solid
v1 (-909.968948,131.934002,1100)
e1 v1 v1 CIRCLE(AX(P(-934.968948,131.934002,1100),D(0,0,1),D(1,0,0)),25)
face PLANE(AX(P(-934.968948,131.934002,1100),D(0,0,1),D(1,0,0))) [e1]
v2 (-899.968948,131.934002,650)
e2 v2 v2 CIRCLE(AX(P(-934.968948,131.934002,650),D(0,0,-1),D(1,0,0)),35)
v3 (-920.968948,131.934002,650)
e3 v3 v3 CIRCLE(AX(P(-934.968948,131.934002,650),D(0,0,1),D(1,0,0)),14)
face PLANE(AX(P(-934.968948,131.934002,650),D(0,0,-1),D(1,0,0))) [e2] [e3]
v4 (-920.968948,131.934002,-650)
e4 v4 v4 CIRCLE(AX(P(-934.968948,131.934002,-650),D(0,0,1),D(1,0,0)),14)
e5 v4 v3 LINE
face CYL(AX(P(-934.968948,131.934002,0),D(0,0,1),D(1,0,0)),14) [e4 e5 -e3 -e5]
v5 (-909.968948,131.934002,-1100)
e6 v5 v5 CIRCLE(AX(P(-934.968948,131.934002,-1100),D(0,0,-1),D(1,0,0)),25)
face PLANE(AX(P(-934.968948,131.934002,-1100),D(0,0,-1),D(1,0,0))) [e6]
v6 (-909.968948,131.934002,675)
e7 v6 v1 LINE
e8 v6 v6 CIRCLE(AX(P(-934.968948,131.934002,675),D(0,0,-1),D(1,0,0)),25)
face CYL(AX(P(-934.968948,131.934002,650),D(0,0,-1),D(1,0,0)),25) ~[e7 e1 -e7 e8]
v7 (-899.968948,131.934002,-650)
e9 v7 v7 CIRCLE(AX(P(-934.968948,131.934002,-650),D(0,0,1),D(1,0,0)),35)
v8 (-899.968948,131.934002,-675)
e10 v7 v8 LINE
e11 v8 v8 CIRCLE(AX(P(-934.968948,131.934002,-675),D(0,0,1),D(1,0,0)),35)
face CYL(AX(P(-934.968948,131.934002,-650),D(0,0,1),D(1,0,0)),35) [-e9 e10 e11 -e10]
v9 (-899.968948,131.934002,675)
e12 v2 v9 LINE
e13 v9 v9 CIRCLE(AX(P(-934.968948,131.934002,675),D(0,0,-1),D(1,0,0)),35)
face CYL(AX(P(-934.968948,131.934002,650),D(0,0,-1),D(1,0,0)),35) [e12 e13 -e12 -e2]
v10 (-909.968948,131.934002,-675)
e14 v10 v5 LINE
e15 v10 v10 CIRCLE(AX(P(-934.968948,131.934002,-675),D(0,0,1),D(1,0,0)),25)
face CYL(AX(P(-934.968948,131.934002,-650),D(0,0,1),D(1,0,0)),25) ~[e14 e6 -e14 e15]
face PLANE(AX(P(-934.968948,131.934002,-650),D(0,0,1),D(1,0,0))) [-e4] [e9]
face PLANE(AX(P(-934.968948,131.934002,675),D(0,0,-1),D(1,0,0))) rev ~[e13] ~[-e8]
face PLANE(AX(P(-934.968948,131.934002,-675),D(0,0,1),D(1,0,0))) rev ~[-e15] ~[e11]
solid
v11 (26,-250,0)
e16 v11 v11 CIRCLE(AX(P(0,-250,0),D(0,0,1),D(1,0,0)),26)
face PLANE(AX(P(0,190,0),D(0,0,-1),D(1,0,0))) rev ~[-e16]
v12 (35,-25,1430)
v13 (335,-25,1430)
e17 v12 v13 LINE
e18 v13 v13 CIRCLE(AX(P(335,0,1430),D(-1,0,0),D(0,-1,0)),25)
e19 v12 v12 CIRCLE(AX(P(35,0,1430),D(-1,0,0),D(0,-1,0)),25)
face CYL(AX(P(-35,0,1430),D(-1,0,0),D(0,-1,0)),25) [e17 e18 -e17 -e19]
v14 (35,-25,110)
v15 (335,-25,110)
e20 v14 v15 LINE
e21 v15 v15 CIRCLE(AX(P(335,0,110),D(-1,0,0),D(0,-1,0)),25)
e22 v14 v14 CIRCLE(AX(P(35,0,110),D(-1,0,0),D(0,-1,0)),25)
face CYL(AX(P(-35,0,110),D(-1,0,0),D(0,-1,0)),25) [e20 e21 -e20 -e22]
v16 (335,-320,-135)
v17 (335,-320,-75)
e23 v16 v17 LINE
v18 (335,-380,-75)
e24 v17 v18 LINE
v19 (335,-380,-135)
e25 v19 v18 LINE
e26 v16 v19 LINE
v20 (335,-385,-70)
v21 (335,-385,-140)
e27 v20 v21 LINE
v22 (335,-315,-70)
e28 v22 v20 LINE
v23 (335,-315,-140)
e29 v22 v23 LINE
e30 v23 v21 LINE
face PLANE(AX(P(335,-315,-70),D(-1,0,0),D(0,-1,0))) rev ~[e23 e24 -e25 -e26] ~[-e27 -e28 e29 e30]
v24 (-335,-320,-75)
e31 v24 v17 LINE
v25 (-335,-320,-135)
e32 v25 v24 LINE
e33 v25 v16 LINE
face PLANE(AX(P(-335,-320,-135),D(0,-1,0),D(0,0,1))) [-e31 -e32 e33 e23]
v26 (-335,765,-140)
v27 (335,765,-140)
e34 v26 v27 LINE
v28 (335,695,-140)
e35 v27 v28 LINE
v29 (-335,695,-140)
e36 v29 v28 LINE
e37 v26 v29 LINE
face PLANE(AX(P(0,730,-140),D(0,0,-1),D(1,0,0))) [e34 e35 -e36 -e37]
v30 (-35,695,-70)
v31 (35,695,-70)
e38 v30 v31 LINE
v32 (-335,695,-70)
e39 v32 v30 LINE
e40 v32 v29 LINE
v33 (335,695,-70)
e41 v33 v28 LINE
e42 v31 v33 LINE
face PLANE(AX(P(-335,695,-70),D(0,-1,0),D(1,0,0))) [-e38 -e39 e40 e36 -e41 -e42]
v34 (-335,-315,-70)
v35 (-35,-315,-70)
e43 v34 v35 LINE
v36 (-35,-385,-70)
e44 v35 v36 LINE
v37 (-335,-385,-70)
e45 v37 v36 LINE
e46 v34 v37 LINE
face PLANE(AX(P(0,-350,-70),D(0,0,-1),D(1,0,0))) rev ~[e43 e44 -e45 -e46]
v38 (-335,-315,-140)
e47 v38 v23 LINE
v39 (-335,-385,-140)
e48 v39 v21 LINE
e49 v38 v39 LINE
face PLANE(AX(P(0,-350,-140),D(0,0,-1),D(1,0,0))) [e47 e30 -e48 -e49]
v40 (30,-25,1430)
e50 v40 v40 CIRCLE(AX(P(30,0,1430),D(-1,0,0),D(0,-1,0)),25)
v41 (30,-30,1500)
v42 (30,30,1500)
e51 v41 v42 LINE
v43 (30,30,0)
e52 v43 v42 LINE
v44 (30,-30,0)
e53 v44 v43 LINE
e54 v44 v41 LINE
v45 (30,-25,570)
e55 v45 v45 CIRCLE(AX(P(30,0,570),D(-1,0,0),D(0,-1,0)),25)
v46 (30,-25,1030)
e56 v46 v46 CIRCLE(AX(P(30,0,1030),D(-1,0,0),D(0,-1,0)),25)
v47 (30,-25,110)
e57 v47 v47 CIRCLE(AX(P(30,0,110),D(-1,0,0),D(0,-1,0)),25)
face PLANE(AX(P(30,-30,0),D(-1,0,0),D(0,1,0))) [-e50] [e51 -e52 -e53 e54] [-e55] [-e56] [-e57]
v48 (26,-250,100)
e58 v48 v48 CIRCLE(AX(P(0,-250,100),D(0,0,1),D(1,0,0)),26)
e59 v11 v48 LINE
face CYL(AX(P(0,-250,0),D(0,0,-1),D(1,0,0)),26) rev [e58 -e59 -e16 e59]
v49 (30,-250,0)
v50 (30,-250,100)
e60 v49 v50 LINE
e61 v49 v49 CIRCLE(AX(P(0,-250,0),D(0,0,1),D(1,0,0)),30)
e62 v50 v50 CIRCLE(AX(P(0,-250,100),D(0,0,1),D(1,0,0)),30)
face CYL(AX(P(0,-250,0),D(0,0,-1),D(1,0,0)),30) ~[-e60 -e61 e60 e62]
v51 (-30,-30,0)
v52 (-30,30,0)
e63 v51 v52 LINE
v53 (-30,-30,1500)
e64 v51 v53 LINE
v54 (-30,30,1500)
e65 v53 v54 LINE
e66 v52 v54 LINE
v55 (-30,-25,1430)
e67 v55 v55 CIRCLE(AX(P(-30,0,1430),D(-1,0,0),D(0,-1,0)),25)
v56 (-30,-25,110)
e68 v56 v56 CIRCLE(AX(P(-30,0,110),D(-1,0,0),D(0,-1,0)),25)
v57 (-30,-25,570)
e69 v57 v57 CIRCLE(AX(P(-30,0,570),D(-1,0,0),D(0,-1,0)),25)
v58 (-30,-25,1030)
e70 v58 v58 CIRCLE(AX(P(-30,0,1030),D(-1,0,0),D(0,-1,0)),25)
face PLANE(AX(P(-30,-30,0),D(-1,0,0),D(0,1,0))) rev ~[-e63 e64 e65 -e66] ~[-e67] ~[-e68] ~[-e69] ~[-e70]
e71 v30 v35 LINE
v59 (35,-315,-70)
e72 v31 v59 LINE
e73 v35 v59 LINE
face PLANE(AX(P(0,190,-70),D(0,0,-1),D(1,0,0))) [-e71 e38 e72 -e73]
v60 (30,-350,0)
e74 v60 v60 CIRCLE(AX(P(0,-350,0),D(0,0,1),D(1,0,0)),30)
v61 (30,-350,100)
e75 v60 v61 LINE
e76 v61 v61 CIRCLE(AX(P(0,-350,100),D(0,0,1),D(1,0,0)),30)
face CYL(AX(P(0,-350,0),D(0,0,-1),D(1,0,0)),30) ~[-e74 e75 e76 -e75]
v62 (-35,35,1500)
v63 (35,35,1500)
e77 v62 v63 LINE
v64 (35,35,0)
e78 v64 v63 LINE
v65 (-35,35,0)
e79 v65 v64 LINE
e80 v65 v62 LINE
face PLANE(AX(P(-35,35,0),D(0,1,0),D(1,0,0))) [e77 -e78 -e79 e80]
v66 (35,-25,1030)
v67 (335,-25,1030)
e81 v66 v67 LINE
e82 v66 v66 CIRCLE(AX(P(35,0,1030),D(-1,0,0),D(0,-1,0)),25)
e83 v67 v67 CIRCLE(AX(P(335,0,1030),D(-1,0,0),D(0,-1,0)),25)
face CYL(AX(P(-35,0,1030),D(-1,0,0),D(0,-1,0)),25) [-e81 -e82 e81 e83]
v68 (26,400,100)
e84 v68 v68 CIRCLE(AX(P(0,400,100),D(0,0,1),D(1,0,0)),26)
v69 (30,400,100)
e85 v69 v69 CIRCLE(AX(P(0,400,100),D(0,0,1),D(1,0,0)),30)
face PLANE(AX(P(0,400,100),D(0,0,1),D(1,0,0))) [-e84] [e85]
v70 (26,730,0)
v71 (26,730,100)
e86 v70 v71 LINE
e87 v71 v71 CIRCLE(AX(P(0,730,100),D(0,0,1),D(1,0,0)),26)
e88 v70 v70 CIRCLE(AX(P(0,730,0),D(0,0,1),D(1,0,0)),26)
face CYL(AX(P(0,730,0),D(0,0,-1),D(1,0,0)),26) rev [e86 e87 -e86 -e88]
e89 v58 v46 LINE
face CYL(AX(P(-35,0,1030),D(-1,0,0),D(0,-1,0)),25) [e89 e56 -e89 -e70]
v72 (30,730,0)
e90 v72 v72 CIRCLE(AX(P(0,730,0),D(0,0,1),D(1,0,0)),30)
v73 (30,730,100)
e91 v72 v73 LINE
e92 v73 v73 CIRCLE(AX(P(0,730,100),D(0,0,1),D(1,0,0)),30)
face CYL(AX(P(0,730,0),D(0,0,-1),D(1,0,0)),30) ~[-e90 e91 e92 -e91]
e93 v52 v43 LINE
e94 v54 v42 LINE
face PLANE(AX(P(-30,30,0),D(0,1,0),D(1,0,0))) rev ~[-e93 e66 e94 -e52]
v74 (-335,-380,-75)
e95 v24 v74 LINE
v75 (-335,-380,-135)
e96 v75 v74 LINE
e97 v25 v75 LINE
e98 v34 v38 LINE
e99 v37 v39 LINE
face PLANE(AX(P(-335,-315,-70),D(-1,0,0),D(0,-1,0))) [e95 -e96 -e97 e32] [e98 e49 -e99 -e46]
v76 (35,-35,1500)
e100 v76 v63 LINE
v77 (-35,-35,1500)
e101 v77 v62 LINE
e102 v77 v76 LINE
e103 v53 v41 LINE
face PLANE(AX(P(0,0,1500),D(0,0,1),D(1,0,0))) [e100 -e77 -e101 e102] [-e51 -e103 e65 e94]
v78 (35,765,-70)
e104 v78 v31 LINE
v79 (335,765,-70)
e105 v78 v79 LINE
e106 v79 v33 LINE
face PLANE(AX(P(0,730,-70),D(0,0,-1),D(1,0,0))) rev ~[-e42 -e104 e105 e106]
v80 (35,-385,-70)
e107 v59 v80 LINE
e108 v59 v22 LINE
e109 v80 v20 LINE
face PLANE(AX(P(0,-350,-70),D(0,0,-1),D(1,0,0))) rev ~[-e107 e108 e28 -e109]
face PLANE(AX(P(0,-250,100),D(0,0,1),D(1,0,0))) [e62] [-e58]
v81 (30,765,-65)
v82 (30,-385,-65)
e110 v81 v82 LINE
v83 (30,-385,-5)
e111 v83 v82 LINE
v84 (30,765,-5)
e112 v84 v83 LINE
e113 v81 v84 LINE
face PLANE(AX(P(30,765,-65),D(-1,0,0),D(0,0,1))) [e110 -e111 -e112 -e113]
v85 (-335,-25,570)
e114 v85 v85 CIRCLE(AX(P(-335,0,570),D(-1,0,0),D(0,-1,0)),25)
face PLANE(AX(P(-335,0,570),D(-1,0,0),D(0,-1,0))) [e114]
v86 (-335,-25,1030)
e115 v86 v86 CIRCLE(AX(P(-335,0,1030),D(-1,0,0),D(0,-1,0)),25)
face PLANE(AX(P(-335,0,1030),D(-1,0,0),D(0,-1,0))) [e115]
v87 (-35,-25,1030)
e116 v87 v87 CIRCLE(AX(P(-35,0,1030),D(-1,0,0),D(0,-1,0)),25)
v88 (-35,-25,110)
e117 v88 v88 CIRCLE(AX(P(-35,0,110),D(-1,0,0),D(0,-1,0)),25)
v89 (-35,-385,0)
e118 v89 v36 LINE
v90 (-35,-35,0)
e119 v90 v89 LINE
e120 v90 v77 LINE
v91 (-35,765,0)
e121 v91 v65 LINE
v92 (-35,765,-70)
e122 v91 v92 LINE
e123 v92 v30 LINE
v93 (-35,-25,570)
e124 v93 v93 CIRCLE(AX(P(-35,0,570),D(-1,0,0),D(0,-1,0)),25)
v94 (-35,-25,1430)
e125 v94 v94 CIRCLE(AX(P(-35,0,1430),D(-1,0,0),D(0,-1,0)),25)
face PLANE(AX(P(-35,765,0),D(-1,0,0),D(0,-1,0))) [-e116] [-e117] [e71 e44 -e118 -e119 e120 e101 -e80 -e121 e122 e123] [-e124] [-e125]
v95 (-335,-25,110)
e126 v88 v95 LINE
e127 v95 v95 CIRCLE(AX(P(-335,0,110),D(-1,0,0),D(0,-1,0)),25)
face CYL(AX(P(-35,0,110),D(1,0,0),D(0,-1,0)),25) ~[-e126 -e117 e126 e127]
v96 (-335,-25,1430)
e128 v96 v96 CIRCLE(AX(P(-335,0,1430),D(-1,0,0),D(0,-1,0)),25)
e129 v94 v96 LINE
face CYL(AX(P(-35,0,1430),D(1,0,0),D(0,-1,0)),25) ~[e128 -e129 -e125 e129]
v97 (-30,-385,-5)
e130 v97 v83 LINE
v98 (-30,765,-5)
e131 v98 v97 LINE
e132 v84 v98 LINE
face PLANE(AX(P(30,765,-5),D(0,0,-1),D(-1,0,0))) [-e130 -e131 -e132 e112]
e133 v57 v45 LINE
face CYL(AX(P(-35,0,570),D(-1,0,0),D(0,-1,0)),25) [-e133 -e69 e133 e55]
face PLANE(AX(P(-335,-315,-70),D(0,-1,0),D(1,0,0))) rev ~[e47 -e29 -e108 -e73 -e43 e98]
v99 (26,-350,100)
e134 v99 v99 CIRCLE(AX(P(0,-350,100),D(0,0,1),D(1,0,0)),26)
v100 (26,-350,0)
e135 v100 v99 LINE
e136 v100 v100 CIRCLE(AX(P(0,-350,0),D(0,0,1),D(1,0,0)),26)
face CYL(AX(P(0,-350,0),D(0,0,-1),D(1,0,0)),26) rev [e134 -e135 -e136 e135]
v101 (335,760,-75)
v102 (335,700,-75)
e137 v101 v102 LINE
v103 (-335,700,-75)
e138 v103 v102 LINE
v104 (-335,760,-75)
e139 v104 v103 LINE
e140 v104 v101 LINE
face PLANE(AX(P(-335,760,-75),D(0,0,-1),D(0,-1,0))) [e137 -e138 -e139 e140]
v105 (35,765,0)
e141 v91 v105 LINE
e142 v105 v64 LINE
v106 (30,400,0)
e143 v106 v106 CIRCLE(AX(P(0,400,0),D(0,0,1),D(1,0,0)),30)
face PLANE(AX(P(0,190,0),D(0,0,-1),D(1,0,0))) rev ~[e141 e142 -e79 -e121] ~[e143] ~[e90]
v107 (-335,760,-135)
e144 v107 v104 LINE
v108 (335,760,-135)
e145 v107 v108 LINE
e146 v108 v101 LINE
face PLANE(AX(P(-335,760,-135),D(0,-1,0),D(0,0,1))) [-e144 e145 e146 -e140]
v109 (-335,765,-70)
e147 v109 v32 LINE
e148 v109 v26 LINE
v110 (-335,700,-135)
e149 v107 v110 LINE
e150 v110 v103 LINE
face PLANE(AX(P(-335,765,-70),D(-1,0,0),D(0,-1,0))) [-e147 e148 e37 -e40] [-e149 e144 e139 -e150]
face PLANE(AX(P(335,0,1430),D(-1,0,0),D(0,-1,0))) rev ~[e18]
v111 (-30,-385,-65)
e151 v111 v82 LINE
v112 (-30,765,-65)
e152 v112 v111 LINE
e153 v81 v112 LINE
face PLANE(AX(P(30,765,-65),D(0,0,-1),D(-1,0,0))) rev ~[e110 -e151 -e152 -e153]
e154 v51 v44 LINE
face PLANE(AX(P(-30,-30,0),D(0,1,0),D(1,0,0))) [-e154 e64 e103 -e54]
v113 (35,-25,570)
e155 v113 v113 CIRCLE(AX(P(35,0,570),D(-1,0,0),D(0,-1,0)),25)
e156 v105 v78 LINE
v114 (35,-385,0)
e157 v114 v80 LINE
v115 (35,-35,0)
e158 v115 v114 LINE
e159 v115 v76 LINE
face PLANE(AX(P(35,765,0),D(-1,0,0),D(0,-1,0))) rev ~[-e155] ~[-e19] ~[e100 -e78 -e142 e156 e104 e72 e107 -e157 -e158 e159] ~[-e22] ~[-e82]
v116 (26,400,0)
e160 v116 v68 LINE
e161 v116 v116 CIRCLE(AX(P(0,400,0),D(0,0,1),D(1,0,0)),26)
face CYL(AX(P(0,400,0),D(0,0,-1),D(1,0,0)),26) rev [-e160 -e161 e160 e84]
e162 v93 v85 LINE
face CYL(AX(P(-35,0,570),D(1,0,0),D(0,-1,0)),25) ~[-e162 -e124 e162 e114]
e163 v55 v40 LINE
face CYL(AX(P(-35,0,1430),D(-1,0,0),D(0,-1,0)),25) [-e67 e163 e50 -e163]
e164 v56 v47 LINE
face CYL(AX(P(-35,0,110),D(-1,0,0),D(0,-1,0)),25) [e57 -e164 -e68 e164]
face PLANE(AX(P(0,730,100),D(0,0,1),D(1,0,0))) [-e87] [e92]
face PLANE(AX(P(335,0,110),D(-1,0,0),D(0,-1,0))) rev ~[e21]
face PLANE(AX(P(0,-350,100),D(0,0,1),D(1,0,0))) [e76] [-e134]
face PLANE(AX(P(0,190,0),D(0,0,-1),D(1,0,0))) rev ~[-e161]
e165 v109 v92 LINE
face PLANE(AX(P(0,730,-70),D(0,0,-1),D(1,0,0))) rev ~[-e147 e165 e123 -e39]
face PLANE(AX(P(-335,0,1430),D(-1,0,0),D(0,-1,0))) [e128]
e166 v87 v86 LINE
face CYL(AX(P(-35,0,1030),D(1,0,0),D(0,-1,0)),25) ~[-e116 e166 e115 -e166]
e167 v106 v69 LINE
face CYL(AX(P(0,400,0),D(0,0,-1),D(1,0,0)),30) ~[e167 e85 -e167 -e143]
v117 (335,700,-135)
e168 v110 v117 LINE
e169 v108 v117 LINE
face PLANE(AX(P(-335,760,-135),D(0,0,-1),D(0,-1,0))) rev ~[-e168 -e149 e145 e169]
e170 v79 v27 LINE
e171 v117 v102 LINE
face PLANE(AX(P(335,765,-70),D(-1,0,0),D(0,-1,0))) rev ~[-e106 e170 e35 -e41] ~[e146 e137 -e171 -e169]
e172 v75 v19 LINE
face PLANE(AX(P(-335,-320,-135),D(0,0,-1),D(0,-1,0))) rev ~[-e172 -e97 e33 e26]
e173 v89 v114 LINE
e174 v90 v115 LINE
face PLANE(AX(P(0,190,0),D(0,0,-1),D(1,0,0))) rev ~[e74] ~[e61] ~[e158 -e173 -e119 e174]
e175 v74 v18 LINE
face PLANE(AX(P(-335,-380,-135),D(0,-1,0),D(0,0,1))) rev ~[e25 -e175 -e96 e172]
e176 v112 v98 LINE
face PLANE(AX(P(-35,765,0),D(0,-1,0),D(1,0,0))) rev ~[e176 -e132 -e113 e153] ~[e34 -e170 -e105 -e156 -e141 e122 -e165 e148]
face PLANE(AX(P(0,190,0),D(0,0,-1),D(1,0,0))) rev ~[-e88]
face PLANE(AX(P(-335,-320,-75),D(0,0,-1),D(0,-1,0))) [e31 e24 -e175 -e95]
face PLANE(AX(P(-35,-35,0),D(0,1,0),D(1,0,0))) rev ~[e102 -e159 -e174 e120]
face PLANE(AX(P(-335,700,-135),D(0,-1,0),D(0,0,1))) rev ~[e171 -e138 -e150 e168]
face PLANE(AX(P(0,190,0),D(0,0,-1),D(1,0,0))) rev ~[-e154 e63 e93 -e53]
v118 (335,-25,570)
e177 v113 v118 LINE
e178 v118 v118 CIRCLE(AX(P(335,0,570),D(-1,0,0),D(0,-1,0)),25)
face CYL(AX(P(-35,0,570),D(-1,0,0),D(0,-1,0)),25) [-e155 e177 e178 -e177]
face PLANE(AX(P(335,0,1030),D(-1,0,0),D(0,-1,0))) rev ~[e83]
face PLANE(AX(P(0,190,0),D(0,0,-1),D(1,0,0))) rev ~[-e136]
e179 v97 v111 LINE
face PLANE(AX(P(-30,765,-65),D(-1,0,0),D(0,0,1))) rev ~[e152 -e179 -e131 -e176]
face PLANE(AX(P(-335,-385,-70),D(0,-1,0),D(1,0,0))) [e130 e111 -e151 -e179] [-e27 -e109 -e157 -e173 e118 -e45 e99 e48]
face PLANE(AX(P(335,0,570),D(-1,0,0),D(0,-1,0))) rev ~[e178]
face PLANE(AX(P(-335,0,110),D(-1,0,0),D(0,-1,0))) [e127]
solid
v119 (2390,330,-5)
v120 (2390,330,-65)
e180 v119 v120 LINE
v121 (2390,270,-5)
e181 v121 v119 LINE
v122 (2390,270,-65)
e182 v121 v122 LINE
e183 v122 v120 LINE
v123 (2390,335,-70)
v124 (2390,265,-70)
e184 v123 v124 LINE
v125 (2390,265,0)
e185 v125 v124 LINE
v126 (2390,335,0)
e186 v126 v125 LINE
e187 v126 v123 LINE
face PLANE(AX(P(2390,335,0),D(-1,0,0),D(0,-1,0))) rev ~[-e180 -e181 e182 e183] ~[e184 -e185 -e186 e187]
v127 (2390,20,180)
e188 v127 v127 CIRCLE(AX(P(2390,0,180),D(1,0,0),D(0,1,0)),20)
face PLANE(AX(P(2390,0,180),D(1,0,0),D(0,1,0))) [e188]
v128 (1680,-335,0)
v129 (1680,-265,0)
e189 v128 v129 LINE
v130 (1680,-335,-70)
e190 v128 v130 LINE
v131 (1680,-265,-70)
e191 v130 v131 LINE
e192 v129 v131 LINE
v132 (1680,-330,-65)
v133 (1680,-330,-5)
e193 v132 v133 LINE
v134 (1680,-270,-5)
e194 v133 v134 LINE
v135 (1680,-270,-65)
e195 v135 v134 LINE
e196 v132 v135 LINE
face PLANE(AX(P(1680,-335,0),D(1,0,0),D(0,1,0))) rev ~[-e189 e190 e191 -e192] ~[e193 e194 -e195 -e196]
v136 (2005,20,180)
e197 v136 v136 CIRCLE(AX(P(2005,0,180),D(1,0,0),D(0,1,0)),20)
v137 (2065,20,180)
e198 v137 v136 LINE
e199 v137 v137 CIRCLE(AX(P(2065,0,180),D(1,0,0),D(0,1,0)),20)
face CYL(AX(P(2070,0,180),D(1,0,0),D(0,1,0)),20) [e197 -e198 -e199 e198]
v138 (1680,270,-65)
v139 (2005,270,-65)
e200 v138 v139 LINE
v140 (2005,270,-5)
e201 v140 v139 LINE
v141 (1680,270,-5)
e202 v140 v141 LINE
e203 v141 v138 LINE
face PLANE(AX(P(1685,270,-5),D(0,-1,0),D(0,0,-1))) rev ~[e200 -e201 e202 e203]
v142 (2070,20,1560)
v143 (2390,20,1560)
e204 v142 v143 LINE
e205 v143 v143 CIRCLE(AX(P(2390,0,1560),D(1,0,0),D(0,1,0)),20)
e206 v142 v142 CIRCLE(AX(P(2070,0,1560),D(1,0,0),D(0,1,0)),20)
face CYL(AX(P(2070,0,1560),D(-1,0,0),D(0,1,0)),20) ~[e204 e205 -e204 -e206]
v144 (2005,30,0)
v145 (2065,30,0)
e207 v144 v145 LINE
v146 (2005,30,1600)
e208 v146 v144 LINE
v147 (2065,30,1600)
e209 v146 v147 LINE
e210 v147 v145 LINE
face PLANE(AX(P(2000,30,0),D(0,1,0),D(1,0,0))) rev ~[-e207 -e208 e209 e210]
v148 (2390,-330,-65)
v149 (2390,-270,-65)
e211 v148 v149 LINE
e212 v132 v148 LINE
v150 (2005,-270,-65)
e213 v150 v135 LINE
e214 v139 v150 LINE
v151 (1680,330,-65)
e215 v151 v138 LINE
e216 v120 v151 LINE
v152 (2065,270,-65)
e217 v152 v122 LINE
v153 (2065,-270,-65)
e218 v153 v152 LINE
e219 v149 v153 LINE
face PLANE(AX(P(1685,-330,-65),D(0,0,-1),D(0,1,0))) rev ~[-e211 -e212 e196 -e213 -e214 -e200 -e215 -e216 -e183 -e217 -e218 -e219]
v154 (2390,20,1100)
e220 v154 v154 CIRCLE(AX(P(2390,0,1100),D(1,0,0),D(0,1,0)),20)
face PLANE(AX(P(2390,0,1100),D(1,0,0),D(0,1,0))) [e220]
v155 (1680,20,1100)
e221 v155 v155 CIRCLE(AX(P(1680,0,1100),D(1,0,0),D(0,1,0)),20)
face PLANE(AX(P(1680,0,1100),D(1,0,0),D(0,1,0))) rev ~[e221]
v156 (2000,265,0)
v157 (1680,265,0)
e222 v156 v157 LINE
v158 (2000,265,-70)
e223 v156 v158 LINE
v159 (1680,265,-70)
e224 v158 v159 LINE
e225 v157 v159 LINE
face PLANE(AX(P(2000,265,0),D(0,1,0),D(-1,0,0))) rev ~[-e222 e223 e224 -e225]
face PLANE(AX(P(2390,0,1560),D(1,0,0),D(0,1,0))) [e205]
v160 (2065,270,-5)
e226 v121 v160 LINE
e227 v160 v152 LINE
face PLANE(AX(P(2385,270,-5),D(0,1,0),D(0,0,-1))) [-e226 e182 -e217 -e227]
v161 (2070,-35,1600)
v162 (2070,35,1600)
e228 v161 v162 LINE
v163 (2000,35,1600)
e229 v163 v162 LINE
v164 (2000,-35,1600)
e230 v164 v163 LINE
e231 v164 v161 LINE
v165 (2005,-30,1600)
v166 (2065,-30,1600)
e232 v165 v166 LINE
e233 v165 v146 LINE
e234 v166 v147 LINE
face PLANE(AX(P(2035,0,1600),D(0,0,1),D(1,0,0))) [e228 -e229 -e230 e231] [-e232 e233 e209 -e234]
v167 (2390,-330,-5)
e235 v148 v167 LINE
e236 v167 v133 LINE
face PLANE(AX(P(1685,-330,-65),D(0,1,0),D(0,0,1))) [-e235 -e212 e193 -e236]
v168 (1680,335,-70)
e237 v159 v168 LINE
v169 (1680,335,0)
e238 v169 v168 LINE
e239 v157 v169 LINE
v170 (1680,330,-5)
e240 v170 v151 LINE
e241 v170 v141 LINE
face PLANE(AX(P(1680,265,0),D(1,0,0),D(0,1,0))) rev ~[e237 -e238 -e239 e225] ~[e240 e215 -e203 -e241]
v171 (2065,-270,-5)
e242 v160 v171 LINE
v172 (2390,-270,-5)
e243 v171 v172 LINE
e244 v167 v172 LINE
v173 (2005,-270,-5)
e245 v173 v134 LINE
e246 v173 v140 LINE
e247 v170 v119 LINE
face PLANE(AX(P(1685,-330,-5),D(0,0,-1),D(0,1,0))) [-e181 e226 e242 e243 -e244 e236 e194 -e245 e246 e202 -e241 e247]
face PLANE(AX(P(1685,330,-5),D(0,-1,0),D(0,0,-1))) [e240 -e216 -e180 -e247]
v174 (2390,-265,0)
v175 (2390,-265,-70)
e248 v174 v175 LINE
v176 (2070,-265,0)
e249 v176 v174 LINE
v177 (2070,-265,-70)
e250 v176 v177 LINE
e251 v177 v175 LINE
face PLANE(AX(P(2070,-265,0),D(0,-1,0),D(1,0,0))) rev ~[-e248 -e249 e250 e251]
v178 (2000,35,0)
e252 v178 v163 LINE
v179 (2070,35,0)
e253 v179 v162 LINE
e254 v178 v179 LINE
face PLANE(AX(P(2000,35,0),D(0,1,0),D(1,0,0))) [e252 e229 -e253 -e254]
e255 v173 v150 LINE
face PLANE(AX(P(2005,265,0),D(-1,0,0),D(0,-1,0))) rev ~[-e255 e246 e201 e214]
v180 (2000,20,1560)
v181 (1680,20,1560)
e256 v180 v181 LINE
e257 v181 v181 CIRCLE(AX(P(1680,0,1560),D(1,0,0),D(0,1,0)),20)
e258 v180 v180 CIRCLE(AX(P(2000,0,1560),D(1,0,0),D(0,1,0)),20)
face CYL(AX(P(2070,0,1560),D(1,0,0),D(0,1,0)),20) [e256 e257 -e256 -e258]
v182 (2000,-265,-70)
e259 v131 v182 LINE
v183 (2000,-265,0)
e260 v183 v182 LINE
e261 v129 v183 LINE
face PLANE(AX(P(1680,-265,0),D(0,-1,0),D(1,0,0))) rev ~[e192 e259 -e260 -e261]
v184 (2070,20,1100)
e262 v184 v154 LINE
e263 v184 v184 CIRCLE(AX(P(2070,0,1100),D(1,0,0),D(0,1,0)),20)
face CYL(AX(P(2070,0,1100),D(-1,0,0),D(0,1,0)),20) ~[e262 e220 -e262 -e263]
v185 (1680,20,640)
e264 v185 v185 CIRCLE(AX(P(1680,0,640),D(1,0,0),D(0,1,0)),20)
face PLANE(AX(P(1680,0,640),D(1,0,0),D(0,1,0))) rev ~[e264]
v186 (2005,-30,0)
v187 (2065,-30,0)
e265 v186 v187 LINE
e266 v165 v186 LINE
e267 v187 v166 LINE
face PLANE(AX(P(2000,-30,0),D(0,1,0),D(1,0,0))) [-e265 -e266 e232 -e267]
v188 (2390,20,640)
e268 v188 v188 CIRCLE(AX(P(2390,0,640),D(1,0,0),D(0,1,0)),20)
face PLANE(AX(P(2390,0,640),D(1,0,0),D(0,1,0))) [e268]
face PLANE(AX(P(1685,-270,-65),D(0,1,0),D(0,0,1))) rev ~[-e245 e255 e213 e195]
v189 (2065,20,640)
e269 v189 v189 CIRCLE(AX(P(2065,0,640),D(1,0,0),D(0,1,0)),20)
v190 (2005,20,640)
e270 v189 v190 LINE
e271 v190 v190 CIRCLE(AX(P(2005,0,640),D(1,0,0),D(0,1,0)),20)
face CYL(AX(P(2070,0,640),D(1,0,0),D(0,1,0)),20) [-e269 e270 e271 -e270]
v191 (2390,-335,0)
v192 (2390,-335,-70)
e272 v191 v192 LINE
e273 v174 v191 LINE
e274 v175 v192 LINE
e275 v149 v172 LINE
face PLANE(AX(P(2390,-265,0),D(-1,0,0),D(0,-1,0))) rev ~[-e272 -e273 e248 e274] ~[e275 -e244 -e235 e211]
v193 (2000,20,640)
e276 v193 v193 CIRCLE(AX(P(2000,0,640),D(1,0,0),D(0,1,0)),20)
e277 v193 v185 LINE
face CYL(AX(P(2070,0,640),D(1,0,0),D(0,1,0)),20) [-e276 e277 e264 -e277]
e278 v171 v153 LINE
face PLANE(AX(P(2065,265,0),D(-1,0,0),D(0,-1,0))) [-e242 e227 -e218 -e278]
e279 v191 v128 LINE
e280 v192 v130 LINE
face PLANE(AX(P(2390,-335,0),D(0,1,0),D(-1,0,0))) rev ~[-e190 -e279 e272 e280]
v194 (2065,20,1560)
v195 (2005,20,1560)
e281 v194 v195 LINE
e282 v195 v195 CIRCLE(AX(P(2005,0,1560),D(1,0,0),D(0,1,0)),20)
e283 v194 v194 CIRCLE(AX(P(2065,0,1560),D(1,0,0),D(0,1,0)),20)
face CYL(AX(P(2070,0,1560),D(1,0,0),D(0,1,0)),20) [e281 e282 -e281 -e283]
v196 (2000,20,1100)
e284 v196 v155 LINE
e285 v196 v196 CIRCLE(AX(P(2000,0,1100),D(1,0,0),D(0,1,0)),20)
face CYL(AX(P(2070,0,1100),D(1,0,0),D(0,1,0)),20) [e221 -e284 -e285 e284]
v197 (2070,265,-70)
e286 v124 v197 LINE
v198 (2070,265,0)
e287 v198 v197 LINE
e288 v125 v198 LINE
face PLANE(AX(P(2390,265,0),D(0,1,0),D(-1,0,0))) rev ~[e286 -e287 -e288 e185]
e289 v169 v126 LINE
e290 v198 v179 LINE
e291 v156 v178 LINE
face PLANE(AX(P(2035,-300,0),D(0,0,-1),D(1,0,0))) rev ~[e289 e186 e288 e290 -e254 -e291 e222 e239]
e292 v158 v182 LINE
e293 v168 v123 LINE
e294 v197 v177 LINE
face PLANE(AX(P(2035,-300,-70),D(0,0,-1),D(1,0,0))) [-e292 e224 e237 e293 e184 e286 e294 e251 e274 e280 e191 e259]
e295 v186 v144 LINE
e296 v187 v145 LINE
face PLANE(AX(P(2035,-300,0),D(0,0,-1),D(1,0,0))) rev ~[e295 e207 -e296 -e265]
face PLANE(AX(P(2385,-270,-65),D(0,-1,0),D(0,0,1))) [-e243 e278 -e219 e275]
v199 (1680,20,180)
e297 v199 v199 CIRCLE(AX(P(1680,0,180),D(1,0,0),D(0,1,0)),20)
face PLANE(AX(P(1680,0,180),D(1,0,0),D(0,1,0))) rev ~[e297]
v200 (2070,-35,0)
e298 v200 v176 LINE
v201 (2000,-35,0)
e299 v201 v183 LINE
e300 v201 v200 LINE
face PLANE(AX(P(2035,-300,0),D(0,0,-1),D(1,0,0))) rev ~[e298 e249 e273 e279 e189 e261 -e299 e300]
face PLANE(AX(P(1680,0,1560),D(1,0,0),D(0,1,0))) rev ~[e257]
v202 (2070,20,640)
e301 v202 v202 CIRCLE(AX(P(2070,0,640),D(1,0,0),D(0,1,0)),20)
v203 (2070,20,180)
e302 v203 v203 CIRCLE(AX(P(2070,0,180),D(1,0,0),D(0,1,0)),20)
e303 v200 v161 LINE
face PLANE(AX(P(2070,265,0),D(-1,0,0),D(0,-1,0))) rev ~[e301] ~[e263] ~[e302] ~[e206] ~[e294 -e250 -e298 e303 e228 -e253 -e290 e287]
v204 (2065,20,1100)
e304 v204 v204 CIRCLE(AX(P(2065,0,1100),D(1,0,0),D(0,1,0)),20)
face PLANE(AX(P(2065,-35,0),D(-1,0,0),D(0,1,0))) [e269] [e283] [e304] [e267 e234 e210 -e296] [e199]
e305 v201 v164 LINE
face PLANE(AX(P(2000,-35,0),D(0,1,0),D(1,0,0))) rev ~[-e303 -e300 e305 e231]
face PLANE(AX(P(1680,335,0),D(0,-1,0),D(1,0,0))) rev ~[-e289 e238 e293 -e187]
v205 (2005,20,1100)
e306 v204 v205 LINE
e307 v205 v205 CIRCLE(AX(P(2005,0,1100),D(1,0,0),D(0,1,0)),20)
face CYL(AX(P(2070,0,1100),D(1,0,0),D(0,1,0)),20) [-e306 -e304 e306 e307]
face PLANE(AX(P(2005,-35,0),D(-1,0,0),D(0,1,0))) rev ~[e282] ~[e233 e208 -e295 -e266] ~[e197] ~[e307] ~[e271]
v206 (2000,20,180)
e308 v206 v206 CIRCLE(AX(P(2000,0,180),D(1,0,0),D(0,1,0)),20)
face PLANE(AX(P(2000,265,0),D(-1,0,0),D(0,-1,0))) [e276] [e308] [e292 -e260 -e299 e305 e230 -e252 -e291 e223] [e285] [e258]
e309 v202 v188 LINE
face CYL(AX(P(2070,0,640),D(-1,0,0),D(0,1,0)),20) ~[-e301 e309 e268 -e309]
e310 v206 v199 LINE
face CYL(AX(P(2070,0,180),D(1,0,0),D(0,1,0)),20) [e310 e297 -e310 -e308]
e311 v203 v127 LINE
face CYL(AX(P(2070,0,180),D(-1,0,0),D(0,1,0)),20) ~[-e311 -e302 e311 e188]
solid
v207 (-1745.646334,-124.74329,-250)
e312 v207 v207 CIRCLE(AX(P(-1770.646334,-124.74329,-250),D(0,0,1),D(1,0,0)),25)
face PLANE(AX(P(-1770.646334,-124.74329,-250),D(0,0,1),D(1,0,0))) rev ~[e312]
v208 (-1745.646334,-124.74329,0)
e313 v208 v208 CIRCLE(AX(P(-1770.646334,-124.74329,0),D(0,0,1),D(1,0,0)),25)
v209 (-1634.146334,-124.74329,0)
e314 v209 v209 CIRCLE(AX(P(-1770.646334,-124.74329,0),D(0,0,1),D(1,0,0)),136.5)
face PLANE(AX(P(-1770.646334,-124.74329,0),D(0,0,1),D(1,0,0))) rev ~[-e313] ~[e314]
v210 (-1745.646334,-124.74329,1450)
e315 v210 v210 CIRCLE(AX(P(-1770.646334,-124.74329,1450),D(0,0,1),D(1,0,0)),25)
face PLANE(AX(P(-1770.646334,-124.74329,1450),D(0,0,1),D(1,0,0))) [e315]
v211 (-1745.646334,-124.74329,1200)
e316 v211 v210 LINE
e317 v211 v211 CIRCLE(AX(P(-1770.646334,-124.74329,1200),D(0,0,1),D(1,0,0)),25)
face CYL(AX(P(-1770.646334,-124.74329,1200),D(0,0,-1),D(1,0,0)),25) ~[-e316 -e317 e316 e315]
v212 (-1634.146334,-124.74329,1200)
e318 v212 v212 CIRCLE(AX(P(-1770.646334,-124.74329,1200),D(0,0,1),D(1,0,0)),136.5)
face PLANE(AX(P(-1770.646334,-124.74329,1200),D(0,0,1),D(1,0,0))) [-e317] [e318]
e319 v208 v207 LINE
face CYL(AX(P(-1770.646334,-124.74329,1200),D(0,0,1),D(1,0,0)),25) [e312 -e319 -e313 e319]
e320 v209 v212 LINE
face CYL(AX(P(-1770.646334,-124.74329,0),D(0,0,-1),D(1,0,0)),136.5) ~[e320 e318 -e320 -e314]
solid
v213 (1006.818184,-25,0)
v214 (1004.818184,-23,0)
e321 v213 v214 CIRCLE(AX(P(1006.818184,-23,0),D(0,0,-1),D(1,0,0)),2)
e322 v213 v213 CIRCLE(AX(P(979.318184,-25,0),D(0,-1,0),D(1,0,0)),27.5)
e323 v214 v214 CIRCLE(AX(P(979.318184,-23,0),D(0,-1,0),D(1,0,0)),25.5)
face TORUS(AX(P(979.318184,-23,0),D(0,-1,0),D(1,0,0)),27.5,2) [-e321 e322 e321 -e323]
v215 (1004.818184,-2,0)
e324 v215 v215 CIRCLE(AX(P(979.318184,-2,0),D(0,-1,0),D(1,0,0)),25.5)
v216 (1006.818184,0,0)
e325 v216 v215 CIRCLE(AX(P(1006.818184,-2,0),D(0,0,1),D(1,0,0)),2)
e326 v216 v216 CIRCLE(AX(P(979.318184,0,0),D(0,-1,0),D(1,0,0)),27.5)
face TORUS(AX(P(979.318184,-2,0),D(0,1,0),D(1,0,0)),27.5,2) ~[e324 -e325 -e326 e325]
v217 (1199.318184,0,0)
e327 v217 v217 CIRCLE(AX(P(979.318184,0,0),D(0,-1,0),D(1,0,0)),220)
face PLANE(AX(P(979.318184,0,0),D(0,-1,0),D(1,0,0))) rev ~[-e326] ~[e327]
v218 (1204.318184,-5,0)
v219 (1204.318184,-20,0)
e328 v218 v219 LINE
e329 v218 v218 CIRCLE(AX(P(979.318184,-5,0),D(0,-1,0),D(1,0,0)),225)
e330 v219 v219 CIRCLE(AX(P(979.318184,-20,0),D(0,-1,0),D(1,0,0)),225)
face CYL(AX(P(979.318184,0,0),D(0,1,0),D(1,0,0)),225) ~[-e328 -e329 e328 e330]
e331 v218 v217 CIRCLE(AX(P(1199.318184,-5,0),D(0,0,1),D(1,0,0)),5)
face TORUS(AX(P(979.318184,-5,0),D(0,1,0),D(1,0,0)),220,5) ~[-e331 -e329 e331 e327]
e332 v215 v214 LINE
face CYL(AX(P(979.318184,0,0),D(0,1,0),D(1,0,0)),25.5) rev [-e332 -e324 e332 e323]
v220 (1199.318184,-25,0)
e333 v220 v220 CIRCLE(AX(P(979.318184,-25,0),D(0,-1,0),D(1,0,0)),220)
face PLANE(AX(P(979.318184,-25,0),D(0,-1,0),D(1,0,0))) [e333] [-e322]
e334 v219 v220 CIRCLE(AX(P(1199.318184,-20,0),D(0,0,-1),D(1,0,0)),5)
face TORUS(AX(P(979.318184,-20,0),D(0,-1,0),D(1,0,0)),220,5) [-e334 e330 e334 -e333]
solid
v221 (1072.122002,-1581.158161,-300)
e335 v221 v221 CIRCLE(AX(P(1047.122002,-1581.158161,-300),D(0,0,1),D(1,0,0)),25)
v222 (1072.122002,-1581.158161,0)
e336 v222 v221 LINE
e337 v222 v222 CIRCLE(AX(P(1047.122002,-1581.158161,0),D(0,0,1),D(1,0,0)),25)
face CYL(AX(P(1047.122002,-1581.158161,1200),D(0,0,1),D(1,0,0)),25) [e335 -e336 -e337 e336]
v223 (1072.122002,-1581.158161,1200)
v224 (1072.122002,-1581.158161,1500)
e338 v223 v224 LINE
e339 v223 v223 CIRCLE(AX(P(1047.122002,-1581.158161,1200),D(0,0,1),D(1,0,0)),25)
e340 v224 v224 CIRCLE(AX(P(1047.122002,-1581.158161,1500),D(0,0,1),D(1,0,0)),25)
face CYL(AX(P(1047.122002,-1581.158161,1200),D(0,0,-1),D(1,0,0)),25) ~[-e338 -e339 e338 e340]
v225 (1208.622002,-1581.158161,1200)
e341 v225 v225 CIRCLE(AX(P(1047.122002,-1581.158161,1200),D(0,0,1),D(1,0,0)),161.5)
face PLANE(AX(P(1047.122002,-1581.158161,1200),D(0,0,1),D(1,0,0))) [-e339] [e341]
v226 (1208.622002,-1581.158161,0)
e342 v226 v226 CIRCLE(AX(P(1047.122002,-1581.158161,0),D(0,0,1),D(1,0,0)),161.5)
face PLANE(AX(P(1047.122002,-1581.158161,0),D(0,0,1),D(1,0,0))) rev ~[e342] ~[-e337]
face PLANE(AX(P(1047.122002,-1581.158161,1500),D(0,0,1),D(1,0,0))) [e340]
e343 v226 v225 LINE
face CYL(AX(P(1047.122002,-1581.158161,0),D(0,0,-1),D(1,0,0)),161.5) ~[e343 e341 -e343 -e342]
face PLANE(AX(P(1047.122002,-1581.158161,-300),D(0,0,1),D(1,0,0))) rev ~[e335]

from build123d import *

# Parameters (mm, degrees)
F0_W      = 70
F0_H      = 70
F0_W_2    = 60
F0_H_2    = 60
F1_DEPTH  = 1500
F2_W      = 70
F2_H      = 1150
F3_DEPTH  = 70
F4_W      = 60
F4_H      = 60
F5_DEPTH  = 1360
F7_W      = 670
F7_H      = 70
F8_DEPTH  = 70
F9_W      = 60
F9_H      = 60
F10_DEPTH = 723
F11_R     = 30
F11_R_2   = 26
F12_DEPTH = 100
F13_R     = 25
F14_DEPTH = 300
F15_DEPTH = 370
F16_R     = 14
F17_DEPTH = 650
F18_R     = 25
F19_DEPTH = 450
F20_R     = 35
F21_DEPTH = 25
F22_DEPTH = 650
F23_R     = 25
F24_DEPTH = 450
F25_R     = 35
F26_DEPTH = 25
F27_R     = 225
F27_R_2   = 25.5
F28_DEPTH = 25
F29_R     = 5
F30_R     = 2
F31_R     = 136.5
F32_DEPTH = 1200
F33_R     = 25
F34_DEPTH = 250
F35_DEPTH = 1450
F36_W     = 70
F36_H     = 70
F37_DEPTH = 1600
F38_T     = -5
F39_W     = 70
F39_H     = 530
F40_DEPTH = 70
F41_T     = -5
F42_R     = 20
F43_DEPTH = 320
F44_DEPTH = 390
F45_R     = 161.5
F46_DEPTH = 1200
F47_R     = 25
F48_DEPTH = 300
F49_DEPTH = 1500


# Not quite as in the source:
# - a shell that OpenCascade refuses in one call is made with other operations: the cavity is built on its own and cut out


with BuildPart() as f1:
    # F0 (on Top) → F1 (new body)
    with BuildSketch(Plane.XY):
        Rectangle(F0_W, F0_H)
        Rectangle(F0_W_2, F0_H_2, mode=Mode.SUBTRACT)
    extrude(amount=F1_DEPTH)

    # F2 (on face) → F3 (join)
    with BuildSketch(Plane(origin=(0, 0, 0), x_dir=(1, 0, 0), z_dir=(0, 0, -1))):
        with Locations((0, -190)):
            Rectangle(F2_W, F2_H)
    extrude(amount=F3_DEPTH)

    # F4 (on face) → F5 (cut)
    with BuildSketch(Plane(origin=(0, 765, 0), x_dir=(-1, 0, 0), z_dir=(0, 1, 0))):
        with Locations((0, -35)):
            Rectangle(F4_W, F4_H)
    extrude(amount=-F5_DEPTH, mode=Mode.SUBTRACT)

    # F7 (on face) → F8 (join)
    with BuildSketch(Plane(origin=(0, 0, -70), x_dir=(1, 0, 0), z_dir=(0, 0, -1))):
        with Locations((0, 350)):
            Rectangle(F7_W, F7_H)
        with Locations((0, -730)):
            Rectangle(F7_W, F7_H)
    extrude(amount=F8_DEPTH)

    # F9 (on face) → F10 (cut)
    with BuildSketch(Plane(origin=(-335, 0, 0), x_dir=(0, -1, 0), z_dir=(-1, 0, 0))):
        with Locations((-730, -105)):
            Rectangle(F9_W, F9_H)
        with Locations((350, -105)):
            Rectangle(F9_W, F9_H)
    extrude(amount=-F10_DEPTH, mode=Mode.SUBTRACT)

    # F11 (on face) → F12 (join)
    with BuildSketch(Plane.XY):
        with Locations((0, -250)):
            Circle(F11_R)
        with Locations((0, -250)):
            Circle(F11_R_2, mode=Mode.SUBTRACT)
        with Locations((0, -350)):
            Circle(F11_R)
        with Locations((0, -350)):
            Circle(F11_R_2, mode=Mode.SUBTRACT)
        with Locations((0, 730)):
            Circle(F11_R)
        with Locations((0, 730)):
            Circle(F11_R_2, mode=Mode.SUBTRACT)
        with Locations((0, 400)):
            Circle(F11_R)
        with Locations((0, 400)):
            Circle(F11_R_2, mode=Mode.SUBTRACT)
    extrude(amount=F12_DEPTH)

    # F13 (on face) → F14 (join)
    with BuildSketch(Plane(origin=(-35, 0, 0), x_dir=(0, -1, 0), z_dir=(-1, 0, 0))):
        with Locations((0, 110)):
            Circle(F13_R)
        with Locations((0, 570)):
            Circle(F13_R)
        with Locations((0, 1030)):
            Circle(F13_R)
        with Locations((0, 1430)):
            Circle(F13_R)
    extrude(amount=F14_DEPTH)

    # F13 (on face) → F15 (join)
    with BuildSketch(Plane(origin=(-35, 0, 0), x_dir=(0, -1, 0), z_dir=(-1, 0, 0))):
        with Locations((0, 110)):
            Circle(F13_R)
        with Locations((0, 570)):
            Circle(F13_R)
        with Locations((0, 1030)):
            Circle(F13_R)
        with Locations((0, 1430)):
            Circle(F13_R)
    extrude(amount=-F15_DEPTH)


with BuildPart() as f17:
    # F16 (on Top) → F17 (new body)
    with BuildSketch(Plane.XY):
        with Locations((-934.9689483643, 131.9340020418)):
            Circle(F16_R)
    extrude(amount=F17_DEPTH)

    # F18 (on face) → F19 (join)
    with BuildSketch(Plane.XY.offset(650)):
        with Locations((-934.9689483643, 131.9340020418)):
            Circle(F18_R)
    extrude(amount=F19_DEPTH)

    # F20 (on face) → F21 (join)
    with BuildSketch(Plane(origin=(0, 0, 650), x_dir=(1, 0, 0), z_dir=(0, 0, -1))):
        with Locations((-934.9689483643, -131.9340020418)):
            Circle(F20_R)
    extrude(amount=-F21_DEPTH)

    # F16 (on Top) → F22 (join)
    with BuildSketch(Plane.XY):
        with Locations((-934.9689483643, 131.9340020418)):
            Circle(F16_R)
    extrude(amount=-F22_DEPTH)

    # F23 (on face) → F24 (join)
    with BuildSketch(Plane(origin=(0, 0, -650), x_dir=(1, 0, 0), z_dir=(0, 0, -1))):
        with Locations((-934.9689483643, -131.9340020418)):
            Circle(F23_R)
    extrude(amount=F24_DEPTH)

    # F25 (on face) → F26 (join)
    with BuildSketch(Plane.XY.offset(-650)):
        with Locations((-934.9689483643, 131.9340020418)):
            Circle(F25_R)
    extrude(amount=-F26_DEPTH)


with BuildPart() as f28:
    # F27 (on Front) → F28 (new body)
    with BuildSketch(Plane.XZ):
        with Locations((979.3181844601, 0)):
            Circle(F27_R)
        with Locations((979.3181844601, 0)):
            Circle(F27_R_2, mode=Mode.SUBTRACT)
    extrude(amount=F28_DEPTH)

    # F29
    f29_edges = [f28.edges().sort_by_distance(p)[0] for p in [
        (754.318184, 0, 0),
        (754.318184, -25, 0),
    ]]
    fillet(f29_edges, radius=F29_R)

    # F30
    f30_edges = [f28.edges().sort_by_distance(p)[0] for p in [
        (953.818184, 0, 0),
        (953.818184, -25, 0),
    ]]
    fillet(f30_edges, radius=F30_R)


with BuildPart() as f32:
    # F31 (on Top) → F32 (new body)
    with BuildSketch(Plane.XY):
        with Locations((-1770.6463336945, -124.7432902455)):
            Circle(F31_R)
    extrude(amount=F32_DEPTH)

    # F33 (on face) → F34 (join)
    with BuildSketch(Plane.XY.offset(1200)):
        with Locations((-1770.6463336945, -124.7432902455)):
            Circle(F33_R)
    extrude(amount=F34_DEPTH)

    # F33 (on face) → F35 (join)
    with BuildSketch(Plane.XY.offset(1200)):
        with Locations((-1770.6463336945, -124.7432902455)):
            Circle(F33_R)
    extrude(amount=-F35_DEPTH)


with BuildPart() as f37:
    # F36 (on Top) → F37 (new body)
    with BuildSketch(Plane.XY):
        with Locations((2035, 0)):
            Rectangle(F36_W, F36_H)
    extrude(amount=F37_DEPTH)

    # F38
    f38_openings = [f37.faces().sort_by_distance(p)[0] for p in [
        (2035, 0, 1600),
        (2035, 0, 0),
    ]]
    offset(amount=F38_T, openings=f38_openings)

    # F39 (on face) → F40 (join)
    with BuildSketch(Plane(origin=(0, 0, 0), x_dir=(1, 0, 0), z_dir=(0, 0, -1))):
        Polygon((1680, 265), (2000, 265), (2070, 265), (2390, 265), (2390, 335), (1680, 335), align=None)
        with Locations((2035, 0)):
            Rectangle(F39_W, F39_H)
        Polygon((2070, -265), (2000, -265), (1680, -265), (1680, -335), (2390, -335), (2390, -265), align=None)
    extrude(amount=F40_DEPTH)

    # F41: a shell. OpenCascade refuses it in one call, so the cavity is built on its own and cut out:
    # the body offset inwards by the wall thickness, plus a prism from it out through each open face.
    f41_core = offset(f37.part, amount=F41_T, kind=Kind.INTERSECTION, mode=Mode.PRIVATE)
    f41_exits = [f41_core.faces().sort_by_distance(p)[0] for p in [
        (2385, -300, -35),
        (2385, 300, -35),
        (1685, 300, -35),
        (1685, -300, -35),
    ]]
    add(f41_core, mode=Mode.SUBTRACT)
    extrude(f41_exits, amount=-F41_T, mode=Mode.SUBTRACT)

    # F42 (on face) → F43 (join)
    with BuildSketch(Plane.YZ.offset(2070)):
        with Locations((0, 180)):
            Circle(F42_R)
        with Locations((0, 640)):
            Circle(F42_R)
        with Locations((0, 1100)):
            Circle(F42_R)
        with Locations((0, 1560)):
            Circle(F42_R)
    extrude(amount=F43_DEPTH)

    # F42 (on face) → F44 (join)
    with BuildSketch(Plane.YZ.offset(2070)):
        with Locations((0, 180)):
            Circle(F42_R)
        with Locations((0, 640)):
            Circle(F42_R)
        with Locations((0, 1100)):
            Circle(F42_R)
        with Locations((0, 1560)):
            Circle(F42_R)
    extrude(amount=-F44_DEPTH)


with BuildPart() as f46:
    # F45 (on Top) → F46 (new body)
    with BuildSketch(Plane.XY):
        with Locations((1047.1220016479, -1581.1581611633)):
            Circle(F45_R)
    extrude(amount=F46_DEPTH)

    # F47 (on face) → F48 (join)
    with BuildSketch(Plane.XY.offset(1200)):
        with Locations((1047.1220016479, -1581.1581611633)):
            Circle(F47_R)
    extrude(amount=F48_DEPTH)

    # F47 (on face) → F49 (join)
    with BuildSketch(Plane.XY.offset(1200)):
        with Locations((1047.1220016479, -1581.1581611633)):
            Circle(F47_R)
    extrude(amount=-F49_DEPTH)


solid = Compound([f1.part, f17.part, f28.part, f32.part, f37.part, f46.part])
